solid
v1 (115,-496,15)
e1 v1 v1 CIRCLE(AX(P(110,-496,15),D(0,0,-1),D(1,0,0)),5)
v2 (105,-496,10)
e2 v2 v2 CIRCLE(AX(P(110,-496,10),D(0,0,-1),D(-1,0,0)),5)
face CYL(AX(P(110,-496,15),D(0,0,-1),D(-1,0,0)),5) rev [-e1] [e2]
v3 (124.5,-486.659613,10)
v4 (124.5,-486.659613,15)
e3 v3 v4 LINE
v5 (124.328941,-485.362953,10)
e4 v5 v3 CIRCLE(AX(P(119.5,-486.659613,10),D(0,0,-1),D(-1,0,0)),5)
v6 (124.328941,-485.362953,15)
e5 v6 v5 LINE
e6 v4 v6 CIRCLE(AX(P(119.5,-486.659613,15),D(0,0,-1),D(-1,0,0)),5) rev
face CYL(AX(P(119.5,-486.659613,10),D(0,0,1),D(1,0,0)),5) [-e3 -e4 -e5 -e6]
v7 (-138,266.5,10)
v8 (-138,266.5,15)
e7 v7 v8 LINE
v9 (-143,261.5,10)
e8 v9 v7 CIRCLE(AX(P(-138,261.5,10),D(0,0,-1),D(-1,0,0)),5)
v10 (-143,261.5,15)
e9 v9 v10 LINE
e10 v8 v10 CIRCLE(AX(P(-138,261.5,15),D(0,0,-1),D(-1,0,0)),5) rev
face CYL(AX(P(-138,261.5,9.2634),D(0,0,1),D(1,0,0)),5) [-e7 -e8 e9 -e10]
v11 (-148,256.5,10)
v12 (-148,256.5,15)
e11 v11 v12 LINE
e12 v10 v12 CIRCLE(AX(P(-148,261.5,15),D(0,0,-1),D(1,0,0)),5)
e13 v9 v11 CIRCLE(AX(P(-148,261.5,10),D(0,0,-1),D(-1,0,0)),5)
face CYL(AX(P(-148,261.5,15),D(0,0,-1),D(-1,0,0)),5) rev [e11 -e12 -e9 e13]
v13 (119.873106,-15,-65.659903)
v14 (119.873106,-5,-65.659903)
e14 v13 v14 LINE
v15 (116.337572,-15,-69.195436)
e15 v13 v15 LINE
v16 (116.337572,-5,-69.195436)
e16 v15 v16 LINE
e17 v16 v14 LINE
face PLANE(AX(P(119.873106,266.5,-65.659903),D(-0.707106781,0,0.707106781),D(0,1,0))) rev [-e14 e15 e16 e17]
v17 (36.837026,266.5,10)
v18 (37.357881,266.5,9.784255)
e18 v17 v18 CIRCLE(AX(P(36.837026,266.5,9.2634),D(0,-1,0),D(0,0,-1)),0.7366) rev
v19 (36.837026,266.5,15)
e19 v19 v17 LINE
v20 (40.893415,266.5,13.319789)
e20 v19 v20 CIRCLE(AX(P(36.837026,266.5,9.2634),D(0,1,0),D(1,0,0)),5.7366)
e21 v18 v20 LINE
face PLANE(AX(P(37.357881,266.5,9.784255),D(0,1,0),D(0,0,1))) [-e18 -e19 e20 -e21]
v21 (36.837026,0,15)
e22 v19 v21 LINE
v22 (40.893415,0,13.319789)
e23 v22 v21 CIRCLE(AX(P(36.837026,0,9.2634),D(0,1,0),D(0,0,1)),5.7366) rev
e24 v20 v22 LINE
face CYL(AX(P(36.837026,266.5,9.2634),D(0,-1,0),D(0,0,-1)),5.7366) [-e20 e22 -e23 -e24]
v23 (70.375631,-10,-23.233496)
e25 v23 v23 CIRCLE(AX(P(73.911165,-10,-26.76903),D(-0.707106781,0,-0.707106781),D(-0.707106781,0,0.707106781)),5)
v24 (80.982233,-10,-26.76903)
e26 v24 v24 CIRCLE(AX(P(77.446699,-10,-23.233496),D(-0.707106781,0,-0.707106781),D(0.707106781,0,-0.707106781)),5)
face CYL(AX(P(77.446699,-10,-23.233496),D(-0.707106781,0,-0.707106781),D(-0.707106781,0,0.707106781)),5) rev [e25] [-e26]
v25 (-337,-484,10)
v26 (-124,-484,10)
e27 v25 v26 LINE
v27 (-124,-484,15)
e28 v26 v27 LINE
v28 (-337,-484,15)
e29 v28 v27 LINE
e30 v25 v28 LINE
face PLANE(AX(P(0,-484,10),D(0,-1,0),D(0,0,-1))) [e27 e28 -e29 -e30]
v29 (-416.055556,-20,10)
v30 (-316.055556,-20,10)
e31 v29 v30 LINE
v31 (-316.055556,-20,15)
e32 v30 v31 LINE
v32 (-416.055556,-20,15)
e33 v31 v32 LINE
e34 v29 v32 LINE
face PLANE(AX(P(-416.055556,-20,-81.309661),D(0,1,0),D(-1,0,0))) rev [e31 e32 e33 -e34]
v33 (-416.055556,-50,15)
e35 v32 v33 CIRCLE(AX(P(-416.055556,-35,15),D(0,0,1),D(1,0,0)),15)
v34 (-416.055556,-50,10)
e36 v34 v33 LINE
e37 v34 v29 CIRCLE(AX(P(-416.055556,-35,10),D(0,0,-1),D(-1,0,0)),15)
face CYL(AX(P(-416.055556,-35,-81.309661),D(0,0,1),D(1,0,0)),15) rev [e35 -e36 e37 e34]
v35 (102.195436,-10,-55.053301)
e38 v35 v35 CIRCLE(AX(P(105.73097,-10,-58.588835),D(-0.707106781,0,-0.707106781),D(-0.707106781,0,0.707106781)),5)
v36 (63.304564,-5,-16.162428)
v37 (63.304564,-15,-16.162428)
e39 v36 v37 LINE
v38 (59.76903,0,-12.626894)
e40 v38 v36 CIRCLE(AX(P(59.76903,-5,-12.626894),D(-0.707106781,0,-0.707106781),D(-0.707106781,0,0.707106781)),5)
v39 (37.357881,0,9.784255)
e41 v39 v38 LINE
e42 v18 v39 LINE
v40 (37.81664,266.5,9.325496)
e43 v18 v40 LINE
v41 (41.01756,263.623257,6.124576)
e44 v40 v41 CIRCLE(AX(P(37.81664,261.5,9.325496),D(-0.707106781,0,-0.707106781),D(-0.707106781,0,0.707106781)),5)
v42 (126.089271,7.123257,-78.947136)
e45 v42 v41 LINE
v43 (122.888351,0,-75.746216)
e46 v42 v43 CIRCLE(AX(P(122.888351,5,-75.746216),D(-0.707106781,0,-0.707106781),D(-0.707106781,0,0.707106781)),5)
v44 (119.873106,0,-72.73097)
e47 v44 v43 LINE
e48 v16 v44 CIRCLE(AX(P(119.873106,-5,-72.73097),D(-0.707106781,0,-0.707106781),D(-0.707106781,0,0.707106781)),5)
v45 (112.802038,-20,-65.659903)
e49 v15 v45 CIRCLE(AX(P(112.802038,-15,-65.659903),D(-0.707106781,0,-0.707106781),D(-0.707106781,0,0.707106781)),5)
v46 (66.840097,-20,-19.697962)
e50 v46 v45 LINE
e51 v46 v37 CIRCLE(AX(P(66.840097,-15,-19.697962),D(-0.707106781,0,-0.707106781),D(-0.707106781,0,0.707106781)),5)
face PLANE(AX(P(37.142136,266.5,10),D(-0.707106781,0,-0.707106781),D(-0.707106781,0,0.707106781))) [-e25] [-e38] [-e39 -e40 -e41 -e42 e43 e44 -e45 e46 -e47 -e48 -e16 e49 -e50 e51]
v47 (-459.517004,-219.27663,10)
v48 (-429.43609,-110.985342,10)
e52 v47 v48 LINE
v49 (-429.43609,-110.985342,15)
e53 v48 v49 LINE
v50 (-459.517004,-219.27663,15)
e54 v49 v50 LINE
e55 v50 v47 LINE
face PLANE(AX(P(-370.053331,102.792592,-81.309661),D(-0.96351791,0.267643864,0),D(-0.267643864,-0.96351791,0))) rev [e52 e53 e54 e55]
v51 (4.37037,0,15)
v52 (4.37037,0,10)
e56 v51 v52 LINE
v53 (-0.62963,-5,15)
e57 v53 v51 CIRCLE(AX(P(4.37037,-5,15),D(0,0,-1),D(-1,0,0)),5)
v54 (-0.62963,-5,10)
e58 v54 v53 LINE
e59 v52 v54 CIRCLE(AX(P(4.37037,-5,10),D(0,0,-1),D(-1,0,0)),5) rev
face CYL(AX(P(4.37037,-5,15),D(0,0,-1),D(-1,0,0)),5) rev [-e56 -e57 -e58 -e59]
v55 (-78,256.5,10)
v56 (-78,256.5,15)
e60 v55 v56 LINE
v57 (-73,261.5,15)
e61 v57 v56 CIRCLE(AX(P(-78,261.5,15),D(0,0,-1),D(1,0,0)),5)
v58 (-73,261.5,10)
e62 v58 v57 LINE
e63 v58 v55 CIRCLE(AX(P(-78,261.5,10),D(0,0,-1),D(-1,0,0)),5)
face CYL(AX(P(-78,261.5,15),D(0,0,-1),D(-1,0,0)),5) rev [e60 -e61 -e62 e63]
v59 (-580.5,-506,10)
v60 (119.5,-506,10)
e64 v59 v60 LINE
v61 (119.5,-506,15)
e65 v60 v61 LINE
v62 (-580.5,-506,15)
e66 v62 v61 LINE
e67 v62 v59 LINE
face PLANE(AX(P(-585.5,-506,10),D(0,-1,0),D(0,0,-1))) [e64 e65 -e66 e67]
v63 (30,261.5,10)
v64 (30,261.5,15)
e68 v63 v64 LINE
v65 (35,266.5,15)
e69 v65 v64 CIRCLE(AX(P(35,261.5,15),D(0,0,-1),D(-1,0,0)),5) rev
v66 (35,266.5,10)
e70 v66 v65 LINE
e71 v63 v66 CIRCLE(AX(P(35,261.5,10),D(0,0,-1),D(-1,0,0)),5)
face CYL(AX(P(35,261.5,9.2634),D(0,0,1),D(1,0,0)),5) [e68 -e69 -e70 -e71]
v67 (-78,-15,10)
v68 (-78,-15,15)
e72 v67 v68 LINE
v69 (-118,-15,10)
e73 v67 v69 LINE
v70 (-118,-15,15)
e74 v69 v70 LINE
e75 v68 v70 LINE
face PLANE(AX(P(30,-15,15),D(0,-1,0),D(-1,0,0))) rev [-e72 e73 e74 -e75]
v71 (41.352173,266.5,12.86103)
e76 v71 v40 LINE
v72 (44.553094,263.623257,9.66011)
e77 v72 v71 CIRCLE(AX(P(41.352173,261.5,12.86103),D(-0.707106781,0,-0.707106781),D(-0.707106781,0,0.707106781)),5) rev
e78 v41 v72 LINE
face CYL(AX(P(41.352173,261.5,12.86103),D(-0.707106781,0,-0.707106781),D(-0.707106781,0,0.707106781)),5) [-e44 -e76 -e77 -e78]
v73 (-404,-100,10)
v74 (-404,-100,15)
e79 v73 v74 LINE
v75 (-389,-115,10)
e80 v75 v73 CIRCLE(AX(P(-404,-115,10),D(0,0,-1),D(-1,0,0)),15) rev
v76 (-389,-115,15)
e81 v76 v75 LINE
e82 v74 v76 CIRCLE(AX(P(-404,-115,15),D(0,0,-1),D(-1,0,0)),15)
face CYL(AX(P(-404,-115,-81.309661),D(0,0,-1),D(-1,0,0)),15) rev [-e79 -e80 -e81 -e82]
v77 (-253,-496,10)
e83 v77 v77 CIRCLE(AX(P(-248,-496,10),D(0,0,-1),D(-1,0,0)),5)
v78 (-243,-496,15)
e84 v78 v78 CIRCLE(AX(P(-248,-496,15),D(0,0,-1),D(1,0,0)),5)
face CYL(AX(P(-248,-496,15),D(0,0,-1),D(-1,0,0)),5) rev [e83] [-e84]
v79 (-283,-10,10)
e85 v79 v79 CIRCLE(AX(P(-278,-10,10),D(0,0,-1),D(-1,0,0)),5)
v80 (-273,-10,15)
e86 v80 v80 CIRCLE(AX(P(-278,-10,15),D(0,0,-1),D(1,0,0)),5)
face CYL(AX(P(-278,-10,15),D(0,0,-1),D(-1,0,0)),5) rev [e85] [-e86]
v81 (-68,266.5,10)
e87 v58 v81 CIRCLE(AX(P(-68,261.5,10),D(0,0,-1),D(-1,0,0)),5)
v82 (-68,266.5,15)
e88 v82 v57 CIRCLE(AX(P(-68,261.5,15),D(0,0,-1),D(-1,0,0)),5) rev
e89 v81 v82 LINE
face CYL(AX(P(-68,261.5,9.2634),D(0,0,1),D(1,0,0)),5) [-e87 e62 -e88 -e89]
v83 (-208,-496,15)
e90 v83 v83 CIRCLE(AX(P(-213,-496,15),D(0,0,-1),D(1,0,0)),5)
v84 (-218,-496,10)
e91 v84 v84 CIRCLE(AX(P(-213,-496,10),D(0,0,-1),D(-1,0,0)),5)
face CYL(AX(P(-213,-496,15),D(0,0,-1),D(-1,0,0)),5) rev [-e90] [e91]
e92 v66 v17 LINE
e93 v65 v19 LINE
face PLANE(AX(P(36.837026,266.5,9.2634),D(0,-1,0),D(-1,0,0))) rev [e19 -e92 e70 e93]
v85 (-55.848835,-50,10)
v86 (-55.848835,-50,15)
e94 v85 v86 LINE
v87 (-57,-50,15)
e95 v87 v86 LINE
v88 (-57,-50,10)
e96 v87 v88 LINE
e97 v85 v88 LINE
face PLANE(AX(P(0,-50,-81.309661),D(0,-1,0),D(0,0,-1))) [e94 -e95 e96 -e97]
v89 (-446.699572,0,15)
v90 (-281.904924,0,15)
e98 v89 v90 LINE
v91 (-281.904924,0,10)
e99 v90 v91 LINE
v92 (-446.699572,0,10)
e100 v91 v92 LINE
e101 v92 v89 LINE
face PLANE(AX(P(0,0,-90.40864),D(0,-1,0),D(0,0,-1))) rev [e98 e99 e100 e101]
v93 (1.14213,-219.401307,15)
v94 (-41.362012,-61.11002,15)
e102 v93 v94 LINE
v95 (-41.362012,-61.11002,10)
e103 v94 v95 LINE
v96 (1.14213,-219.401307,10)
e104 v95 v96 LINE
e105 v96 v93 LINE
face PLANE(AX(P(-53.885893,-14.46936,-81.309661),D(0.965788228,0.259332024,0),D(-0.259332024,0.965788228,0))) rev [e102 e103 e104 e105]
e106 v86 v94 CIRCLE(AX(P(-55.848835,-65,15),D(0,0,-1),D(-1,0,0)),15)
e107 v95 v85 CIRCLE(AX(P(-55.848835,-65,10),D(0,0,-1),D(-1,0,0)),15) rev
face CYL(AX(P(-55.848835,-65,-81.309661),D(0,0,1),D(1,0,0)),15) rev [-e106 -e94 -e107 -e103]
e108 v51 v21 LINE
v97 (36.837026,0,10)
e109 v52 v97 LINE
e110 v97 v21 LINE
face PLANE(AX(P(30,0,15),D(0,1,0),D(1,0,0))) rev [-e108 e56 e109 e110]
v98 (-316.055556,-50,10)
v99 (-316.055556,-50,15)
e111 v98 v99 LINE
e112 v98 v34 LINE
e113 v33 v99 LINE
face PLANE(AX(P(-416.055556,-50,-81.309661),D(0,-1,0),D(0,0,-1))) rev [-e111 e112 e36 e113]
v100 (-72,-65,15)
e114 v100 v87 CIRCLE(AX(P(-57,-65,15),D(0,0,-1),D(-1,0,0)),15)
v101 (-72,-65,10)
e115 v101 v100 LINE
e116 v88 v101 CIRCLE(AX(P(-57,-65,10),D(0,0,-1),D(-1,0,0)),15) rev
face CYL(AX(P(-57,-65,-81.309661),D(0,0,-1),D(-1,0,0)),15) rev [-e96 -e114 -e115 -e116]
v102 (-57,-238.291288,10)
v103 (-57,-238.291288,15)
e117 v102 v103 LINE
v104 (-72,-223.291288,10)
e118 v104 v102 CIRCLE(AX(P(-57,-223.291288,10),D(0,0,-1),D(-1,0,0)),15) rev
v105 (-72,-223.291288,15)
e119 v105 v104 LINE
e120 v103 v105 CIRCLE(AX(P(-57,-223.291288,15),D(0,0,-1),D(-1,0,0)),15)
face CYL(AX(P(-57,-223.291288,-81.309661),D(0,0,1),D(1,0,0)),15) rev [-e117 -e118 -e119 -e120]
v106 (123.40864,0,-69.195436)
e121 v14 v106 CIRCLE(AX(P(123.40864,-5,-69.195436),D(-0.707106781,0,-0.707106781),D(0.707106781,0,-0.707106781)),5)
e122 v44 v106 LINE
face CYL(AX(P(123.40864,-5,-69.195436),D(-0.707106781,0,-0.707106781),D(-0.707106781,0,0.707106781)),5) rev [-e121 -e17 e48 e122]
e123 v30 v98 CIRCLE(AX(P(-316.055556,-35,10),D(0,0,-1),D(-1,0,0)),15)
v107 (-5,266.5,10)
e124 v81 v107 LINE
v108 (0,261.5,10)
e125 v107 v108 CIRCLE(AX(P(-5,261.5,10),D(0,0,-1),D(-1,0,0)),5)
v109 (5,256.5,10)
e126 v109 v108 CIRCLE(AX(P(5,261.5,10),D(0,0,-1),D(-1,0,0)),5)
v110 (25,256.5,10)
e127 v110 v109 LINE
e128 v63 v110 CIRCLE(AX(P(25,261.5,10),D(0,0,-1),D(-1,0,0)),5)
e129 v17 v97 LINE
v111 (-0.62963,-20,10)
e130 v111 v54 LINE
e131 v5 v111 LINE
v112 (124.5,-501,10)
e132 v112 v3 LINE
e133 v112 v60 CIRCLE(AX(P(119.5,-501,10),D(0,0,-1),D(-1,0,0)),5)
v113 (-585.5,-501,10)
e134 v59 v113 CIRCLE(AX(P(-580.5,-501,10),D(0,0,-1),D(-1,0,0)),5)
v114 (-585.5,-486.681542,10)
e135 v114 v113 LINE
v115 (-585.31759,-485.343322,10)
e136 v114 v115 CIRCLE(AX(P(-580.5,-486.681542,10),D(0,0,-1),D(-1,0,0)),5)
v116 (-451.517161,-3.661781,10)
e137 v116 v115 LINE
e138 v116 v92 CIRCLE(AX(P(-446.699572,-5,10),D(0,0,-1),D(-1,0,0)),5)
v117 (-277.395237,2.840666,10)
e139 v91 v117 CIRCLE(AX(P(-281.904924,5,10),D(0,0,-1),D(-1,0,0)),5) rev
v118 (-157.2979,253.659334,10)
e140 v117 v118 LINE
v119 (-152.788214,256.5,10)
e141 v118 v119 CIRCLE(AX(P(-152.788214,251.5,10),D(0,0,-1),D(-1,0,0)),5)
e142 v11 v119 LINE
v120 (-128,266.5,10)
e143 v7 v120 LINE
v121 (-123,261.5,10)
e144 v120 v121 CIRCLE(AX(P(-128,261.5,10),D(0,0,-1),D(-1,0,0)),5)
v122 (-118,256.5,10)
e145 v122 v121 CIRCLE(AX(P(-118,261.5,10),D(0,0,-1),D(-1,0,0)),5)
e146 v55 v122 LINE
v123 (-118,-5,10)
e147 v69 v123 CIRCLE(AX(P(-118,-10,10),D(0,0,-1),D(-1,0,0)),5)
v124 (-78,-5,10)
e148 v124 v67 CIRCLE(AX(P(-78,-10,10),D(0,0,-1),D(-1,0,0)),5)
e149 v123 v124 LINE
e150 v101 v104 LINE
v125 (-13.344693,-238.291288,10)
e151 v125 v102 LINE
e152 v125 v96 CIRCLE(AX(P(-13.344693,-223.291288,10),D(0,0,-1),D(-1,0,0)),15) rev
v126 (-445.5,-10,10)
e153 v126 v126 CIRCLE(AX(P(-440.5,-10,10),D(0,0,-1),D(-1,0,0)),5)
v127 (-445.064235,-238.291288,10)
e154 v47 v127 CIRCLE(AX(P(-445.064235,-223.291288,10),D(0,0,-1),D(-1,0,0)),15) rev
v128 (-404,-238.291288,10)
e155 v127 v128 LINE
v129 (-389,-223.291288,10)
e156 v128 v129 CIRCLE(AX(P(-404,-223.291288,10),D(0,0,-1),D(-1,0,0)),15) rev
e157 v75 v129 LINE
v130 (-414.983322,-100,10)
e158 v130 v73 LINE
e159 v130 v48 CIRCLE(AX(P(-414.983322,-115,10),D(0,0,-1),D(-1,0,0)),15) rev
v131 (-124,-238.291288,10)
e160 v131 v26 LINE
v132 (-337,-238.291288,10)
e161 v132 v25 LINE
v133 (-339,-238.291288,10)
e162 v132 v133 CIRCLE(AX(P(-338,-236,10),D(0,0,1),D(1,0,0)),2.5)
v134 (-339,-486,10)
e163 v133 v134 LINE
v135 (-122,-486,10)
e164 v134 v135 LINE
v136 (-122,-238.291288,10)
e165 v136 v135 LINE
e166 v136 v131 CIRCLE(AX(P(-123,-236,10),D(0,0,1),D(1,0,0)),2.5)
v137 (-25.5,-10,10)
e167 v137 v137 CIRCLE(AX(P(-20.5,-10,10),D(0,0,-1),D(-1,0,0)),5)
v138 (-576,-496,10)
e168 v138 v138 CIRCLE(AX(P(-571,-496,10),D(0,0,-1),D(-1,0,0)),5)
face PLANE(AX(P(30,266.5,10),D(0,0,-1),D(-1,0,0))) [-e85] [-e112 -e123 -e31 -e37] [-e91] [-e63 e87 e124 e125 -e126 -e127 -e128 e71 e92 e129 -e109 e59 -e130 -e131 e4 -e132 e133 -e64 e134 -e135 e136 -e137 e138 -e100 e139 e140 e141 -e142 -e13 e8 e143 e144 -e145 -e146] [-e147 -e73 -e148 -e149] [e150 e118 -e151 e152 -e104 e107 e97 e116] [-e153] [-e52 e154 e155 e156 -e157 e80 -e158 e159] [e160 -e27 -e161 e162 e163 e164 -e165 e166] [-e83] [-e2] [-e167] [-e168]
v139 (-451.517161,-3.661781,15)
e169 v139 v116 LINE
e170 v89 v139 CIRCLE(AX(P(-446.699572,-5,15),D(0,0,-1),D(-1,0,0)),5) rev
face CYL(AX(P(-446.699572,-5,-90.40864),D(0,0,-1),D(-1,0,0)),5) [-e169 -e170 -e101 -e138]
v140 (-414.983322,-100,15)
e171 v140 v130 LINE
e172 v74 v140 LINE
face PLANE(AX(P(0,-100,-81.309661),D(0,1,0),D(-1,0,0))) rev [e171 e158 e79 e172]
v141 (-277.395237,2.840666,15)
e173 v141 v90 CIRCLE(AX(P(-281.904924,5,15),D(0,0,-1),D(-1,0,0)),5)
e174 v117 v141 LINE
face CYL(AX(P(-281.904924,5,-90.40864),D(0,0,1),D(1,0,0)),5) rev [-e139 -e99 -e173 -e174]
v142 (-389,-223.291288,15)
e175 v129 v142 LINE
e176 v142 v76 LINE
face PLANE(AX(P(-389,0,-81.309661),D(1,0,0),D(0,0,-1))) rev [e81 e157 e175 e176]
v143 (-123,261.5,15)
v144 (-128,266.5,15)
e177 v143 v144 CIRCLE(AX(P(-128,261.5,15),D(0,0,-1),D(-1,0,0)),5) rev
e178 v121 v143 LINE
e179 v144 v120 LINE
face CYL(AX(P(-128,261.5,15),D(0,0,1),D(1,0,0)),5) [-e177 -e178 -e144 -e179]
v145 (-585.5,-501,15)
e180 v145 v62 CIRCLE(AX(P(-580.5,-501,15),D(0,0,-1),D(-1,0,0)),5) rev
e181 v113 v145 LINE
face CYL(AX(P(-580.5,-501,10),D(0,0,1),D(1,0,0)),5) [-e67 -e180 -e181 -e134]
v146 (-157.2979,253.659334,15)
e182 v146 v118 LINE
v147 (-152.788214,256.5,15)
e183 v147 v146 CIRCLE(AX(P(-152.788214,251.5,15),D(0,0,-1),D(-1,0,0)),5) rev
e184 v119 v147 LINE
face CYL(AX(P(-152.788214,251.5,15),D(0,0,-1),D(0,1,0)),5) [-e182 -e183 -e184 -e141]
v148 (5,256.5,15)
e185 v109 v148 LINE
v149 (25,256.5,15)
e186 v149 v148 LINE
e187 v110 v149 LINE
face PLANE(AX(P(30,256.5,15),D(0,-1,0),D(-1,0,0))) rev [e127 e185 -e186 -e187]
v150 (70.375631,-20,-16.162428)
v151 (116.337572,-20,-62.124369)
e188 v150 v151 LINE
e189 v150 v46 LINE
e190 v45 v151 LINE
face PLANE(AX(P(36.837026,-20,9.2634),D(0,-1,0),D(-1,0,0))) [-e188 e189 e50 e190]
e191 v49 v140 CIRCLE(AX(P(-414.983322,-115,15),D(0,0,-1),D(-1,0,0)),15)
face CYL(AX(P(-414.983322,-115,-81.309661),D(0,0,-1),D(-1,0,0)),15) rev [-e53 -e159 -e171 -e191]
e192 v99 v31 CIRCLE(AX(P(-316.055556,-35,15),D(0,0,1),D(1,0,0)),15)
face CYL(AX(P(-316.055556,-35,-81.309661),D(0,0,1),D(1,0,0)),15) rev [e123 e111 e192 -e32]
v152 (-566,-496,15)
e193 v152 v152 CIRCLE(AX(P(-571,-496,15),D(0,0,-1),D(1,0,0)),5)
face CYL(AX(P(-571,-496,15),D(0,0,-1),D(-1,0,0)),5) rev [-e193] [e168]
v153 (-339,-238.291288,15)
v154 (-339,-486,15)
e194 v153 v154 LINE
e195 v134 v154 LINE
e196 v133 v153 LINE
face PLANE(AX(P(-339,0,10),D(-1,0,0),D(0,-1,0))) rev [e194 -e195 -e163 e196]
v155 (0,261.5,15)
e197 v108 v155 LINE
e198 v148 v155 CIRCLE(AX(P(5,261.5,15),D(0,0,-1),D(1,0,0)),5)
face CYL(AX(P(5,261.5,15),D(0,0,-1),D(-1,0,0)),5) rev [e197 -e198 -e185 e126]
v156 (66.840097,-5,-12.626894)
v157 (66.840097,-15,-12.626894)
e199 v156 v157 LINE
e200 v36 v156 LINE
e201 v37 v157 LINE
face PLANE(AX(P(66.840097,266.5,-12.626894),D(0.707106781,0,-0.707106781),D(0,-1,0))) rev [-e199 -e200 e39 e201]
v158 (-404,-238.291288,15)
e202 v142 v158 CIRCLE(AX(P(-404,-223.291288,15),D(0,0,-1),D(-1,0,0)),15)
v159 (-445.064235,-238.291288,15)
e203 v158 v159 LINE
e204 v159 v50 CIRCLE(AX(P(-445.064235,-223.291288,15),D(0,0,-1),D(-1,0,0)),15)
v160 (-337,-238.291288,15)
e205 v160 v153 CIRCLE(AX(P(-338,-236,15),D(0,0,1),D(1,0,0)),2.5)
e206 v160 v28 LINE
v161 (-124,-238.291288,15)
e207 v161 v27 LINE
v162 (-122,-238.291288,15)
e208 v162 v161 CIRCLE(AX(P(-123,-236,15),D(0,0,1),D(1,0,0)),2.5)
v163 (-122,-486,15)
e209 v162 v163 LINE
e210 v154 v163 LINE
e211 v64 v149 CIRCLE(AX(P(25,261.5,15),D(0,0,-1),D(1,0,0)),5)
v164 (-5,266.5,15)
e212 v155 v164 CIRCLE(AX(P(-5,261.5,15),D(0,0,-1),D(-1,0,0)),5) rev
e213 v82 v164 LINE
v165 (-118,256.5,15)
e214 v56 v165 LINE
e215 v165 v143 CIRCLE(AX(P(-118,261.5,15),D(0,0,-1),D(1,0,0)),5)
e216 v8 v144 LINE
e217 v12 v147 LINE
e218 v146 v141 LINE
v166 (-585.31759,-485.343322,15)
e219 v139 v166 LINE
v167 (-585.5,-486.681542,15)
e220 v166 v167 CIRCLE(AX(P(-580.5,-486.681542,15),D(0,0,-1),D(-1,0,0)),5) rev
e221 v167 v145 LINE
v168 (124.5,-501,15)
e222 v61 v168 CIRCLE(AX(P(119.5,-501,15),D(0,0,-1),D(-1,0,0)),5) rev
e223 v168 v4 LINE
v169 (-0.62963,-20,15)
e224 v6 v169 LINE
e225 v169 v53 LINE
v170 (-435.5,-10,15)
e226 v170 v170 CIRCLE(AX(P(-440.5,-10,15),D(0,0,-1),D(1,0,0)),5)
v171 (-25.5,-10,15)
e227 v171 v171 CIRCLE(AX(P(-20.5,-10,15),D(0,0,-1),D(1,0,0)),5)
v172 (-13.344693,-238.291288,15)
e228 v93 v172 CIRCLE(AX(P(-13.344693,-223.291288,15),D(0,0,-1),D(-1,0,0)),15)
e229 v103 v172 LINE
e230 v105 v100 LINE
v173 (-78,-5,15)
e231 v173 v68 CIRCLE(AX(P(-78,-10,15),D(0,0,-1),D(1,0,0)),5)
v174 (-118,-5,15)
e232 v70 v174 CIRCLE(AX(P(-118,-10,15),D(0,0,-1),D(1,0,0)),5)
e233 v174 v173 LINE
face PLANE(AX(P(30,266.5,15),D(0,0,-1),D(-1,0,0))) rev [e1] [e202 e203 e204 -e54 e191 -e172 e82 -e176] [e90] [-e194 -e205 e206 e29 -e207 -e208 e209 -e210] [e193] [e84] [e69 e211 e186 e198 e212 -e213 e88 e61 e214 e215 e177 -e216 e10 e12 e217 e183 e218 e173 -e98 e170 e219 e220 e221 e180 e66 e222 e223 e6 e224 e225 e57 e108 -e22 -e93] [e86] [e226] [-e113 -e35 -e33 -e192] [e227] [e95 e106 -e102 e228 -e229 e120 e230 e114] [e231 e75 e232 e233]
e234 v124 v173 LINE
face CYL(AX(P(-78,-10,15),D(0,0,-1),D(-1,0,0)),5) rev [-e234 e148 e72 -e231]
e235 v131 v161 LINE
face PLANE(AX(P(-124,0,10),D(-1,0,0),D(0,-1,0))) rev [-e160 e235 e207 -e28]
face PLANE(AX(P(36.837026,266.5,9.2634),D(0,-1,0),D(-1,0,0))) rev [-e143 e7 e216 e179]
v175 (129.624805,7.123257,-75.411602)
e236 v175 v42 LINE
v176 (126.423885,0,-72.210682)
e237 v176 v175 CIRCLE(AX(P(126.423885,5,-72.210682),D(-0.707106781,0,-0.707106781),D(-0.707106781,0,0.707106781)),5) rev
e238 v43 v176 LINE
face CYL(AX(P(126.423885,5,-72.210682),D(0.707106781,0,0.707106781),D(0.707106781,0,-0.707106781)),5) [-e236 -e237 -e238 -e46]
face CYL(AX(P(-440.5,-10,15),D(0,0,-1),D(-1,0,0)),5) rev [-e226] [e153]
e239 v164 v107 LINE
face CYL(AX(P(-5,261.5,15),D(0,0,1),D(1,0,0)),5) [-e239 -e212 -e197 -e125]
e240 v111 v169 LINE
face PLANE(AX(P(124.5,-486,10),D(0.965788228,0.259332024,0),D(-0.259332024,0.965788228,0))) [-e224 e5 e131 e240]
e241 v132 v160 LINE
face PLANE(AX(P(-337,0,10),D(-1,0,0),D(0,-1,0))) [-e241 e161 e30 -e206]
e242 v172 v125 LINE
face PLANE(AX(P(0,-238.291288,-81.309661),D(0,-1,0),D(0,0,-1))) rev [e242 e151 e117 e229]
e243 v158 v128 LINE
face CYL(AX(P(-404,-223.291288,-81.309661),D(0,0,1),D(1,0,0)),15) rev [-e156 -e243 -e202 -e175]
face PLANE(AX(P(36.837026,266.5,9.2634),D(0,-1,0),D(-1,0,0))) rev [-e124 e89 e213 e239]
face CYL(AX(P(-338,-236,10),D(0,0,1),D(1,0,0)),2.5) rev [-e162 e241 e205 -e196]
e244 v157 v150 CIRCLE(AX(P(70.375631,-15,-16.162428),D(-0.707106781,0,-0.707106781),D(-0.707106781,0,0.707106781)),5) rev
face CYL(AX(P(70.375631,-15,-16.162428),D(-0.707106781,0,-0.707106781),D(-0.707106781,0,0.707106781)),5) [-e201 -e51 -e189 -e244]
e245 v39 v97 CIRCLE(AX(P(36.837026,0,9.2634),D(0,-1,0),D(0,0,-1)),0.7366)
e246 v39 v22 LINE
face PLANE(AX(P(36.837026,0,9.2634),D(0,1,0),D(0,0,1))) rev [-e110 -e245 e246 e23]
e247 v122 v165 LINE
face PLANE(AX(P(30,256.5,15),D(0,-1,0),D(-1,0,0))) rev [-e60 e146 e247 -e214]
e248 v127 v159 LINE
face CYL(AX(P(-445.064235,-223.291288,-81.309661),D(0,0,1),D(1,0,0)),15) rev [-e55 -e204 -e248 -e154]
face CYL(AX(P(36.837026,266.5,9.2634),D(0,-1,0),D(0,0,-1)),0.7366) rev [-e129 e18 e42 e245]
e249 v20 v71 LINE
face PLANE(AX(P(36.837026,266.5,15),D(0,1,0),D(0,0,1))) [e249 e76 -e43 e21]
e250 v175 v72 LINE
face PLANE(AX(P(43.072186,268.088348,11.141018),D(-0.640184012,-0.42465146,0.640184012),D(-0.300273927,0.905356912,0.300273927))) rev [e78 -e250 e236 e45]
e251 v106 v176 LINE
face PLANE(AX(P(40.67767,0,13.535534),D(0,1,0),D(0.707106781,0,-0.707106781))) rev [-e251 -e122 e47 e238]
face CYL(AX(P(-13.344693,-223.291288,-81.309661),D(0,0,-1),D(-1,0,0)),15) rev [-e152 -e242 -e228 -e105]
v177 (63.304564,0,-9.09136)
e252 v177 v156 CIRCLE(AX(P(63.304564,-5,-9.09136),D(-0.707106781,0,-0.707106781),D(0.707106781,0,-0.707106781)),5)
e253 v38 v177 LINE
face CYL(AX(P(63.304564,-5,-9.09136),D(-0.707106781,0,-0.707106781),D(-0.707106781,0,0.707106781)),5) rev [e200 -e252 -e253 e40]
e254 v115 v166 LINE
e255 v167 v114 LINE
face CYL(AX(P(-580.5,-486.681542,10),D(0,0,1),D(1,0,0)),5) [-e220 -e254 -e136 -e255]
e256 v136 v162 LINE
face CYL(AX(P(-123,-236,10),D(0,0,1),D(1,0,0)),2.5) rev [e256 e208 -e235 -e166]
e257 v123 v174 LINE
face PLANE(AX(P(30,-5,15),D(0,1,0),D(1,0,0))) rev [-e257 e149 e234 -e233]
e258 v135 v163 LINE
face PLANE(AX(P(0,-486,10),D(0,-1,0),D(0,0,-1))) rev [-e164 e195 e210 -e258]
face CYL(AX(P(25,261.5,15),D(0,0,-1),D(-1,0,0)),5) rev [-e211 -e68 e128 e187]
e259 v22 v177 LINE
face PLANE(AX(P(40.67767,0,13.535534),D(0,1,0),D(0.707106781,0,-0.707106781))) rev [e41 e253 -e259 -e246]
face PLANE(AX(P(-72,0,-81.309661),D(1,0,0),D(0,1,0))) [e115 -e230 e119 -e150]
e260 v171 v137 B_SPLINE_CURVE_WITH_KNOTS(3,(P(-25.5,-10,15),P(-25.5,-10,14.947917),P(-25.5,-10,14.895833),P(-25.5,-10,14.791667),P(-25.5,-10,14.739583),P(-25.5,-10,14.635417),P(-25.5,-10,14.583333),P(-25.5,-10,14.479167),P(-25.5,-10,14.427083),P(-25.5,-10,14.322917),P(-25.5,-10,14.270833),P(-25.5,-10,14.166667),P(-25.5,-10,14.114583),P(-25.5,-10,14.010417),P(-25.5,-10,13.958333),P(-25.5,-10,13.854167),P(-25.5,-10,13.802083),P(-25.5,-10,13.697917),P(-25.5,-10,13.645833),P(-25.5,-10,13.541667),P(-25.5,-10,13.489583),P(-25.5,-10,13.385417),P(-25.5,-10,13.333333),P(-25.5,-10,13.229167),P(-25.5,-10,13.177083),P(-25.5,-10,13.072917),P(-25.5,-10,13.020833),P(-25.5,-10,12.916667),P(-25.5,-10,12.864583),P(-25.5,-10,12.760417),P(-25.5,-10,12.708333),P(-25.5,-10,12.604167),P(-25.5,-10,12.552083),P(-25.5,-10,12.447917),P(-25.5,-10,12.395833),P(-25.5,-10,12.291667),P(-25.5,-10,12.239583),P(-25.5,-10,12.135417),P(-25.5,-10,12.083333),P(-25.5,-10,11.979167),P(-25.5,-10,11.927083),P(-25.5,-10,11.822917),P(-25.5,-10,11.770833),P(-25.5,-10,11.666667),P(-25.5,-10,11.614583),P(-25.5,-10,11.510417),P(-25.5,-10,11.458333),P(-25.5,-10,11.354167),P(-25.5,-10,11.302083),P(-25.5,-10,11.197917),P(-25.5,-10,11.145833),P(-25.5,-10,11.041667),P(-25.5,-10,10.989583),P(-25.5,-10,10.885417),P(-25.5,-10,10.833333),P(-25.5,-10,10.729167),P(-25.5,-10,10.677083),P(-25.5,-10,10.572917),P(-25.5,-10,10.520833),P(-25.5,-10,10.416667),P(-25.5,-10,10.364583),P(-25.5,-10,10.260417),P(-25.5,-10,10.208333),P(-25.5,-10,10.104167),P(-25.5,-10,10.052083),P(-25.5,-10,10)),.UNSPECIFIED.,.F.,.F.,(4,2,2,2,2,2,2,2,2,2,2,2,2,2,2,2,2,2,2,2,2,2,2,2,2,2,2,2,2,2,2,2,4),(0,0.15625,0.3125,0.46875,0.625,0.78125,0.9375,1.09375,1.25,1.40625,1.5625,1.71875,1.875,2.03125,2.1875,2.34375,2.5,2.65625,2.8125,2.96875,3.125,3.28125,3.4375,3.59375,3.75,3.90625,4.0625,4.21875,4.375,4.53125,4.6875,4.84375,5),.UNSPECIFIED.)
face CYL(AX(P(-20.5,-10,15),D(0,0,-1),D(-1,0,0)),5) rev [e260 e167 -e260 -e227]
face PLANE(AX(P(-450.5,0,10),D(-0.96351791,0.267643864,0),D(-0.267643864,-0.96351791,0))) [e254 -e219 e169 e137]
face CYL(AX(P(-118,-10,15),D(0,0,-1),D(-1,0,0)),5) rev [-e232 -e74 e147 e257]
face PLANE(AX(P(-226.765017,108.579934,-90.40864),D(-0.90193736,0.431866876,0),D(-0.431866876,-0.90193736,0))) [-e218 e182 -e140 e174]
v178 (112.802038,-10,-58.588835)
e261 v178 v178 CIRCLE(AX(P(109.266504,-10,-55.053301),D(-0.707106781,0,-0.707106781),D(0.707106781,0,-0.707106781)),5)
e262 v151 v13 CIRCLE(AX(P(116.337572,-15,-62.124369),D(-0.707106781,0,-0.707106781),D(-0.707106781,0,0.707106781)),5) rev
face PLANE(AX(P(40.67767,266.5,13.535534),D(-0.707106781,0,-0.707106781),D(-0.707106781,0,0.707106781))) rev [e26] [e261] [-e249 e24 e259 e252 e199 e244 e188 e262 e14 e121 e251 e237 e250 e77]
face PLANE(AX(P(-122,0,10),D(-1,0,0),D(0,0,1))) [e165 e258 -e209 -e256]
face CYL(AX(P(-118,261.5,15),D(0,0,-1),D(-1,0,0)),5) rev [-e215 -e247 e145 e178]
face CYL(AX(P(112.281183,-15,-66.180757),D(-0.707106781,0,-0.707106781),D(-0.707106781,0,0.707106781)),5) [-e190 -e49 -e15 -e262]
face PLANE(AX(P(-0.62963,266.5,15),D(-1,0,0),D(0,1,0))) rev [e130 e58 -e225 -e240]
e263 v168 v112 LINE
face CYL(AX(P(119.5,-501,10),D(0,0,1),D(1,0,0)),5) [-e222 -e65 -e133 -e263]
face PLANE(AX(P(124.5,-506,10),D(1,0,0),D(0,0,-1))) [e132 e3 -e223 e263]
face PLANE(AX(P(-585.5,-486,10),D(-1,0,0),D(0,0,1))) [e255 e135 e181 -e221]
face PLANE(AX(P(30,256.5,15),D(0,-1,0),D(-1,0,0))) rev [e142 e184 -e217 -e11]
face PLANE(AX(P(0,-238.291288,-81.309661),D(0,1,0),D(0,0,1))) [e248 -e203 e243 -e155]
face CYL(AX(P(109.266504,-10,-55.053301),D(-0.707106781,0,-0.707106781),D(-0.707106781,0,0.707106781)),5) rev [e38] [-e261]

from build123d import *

# Parameters (mm, degrees)
SM_BASE_FLANGE_1_DEPTH      = 266.5
SM_BASE_FLANGE_1_DEPTH_BACK = 20
EXTRUDE_2_DEPTH             = 5
CUT_EXTRUDE_1_DEPTH         = 781.997587301
SKETCH_16_R                 = 5
CUT_EXTRUDE_6_DEPTH         = 804.201519225
CUT_EXTRUDE_7_DEPTH         = 780.82164677
SKETCH_18_W                 = 41.523044305
SKETCH_18_H                 = 20
SKETCH_18_R                 = 5
CUT_EXTRUDE_8_DEPTH         = 780.82164677
CUT_EXTRUDE_9_DEPTH         = 5
CUT_EXTRUDE_10_DEPTH        = 780.82164677
FILLET_1_R                  = 5
FILLET_2_R                  = 15
FILLET_3_R                  = 5


# Sheet-metal steps are written as plain solids
with BuildPart() as part:
    # Sketch 1 → ﾍﾞｰｽ-ﾌﾗﾝｼﾞ1 (new, two sides: drawn at the far end of the back side and taken through both)
    with BuildSketch(Plane(origin=(0, 0, 0), x_dir=(1, 0, 0), z_dir=(0, 1, 0)).offset(-SM_BASE_FLANGE_1_DEPTH_BACK)):
        with BuildLine():
            Line((137.550775542, 90.408639918), (37.357880769, -9.784254855))
            ThreePointArc((37.357880769, -9.784254855), (37.11891053, -9.943929664), (36.837025914, -10))
            Line((36.837025914, -10), (30, -10))
            Line((30, -10), (-450.5, -10))
            Line((-450.5, -10), (-450.5, -15))
            Line((-450.5, -15), (30, -15))
            Line((30, -15), (36.837025914, -15))
            ThreePointArc((36.837025914, -15), (39.032327692, -14.563327326), (40.893414675, -13.319788761))
            Line((40.893414675, -13.319788761), (141.086309448, 86.873106012))
            Line((141.086309448, 86.873106012), (137.550775542, 90.408639918))
        make_face()
    extrude(amount=SM_BASE_FLANGE_1_DEPTH + SM_BASE_FLANGE_1_DEPTH_BACK)

    # ｽｹｯﾁ15 → ﾎﾞｽ - 押し出し2 (add)
    with BuildSketch(Plane.XY.offset(15)):
        Polygon((-450.5, 0), (-585.5, -486), (-585.5, -506), (124.5, -506), (124.5, -486), (-6, 0), align=None)
    extrude(amount=-EXTRUDE_2_DEPTH)

    # ｽｹｯﾁ7 → ｶｯﾄ - 押し出し1 (cut, through all)
    with BuildSketch(Plane.XY.offset(15)):
        Polygon((-278.755408603, 0), (-151.149515417, 266.5), (-450.5, 266.5), (-450.5, 0), align=None)
    extrude(amount=-CUT_EXTRUDE_1_DEPTH, mode=Mode.SUBTRACT)

    # ｽｹｯﾁ16 → ｶｯﾄ - 押し出し6 (cut, through all)
    with BuildSketch(Plane(origin=(27.106601718, 0, 27.106601718), x_dir=(0.7071067811865438, 0, -0.7071067811865513), z_dir=(0.7071067811865513, 0, 0.7071067811865438))):
        with BuildLine():
            Line((23.323748893, 266.5), (148.323748893, 0))
            Line((148.323748893, 0), (136.191648507, 0))
            ThreePointArc((136.191648507, 0), (132.656114601, -1.464466094), (131.191648507, -5))
            Line((131.191648507, -5), (131.191648507, -20))
            Line((131.191648507, -20), (141.191648507, -20))
            Line((141.191648507, -20), (161.191648507, -20))
            Line((161.191648507, -20), (161.191648507, 266.5))
            Line((161.191648507, 266.5), (23.323748893, 266.5))
        make_face()
        with BuildLine():
            Line((51.191648507, 0), (19.497497865, 0))
            Line((19.497497865, 0), (19.497497865, -20))
            Line((19.497497865, -20), (46.191648507, -20))
            Line((46.191648507, -20), (56.191648507, -20))
            Line((56.191648507, -20), (56.191648507, -5))
            ThreePointArc((56.191648507, -5), (54.727182413, -1.464466094), (51.191648507, 0))
        make_face()
        with Locations(Location((116.191648507, -10, 0), (0, 0, 180))):
            Circle(SKETCH_16_R)
        with Locations(Location((71.191648507, -10, 0), (0, 0, 180))):
            Circle(SKETCH_16_R)
    extrude(amount=-CUT_EXTRUDE_6_DEPTH, mode=Mode.SUBTRACT)

    # ｽｹｯﾁ17 → ｶｯﾄ - 押し出し7 (cut, through all)
    with BuildSketch(Plane.XY.offset(15)):
        with BuildLine():
            Line((-416.055555556, -20), (-316.055555556, -20))
            ThreePointArc((-316.055555556, -20), (-301.055555556, -35), (-316.055555556, -50))
            Line((-316.055555556, -50), (-416.055555556, -50))
            ThreePointArc((-416.055555556, -50), (-431.055555556, -35), (-416.055555556, -20))
        make_face()
    extrude(amount=-CUT_EXTRUDE_7_DEPTH, mode=Mode.SUBTRACT)

    # ｽｹｯﾁ18 → ｶｯﾄ - 押し出し8 (cut, through all)
    with BuildSketch(Plane.XY.offset(15)):
        with BuildLine():
            Line((-78, -5), (-118, -5))
            ThreePointArc((-118, -5), (-123, -10), (-118, -15))
            Line((-118, -15), (-78, -15))
            ThreePointArc((-78, -15), (-73, -10), (-78, -5))
        make_face()
        with BuildLine():
            Line((-123, 266.5), (-123, 261.5))
            ThreePointArc((-123, 261.5), (-121.535533906, 257.964466094), (-118, 256.5))
            Line((-118, 256.5), (-78, 256.5))
            ThreePointArc((-78, 256.5), (-74.464466094, 257.964466094), (-73, 261.5))
            Line((-73, 261.5), (-73, 266.5))
            Line((-73, 266.5), (-123, 266.5))
        make_face()
        with BuildLine():
            ThreePointArc((0, 261.5), (1.464466094, 257.964466094), (5, 256.5))
            Line((5, 256.5), (25, 256.5))
            ThreePointArc((25, 256.5), (28.535533906, 257.964466094), (30, 261.5))
            Line((30, 261.5), (30, 266.5))
            Line((30, 266.5), (0, 266.5))
            Line((0, 266.5), (0, 261.5))
        make_face()
        with BuildLine():
            Line((-143, 266.5), (-151.149515417, 266.5))
            Line((-151.149515417, 266.5), (-155.937729045, 256.5))
            Line((-155.937729045, 256.5), (-148, 256.5))
            ThreePointArc((-148, 256.5), (-144.464466094, 257.964466094), (-143, 261.5))
            Line((-143, 261.5), (-143, 266.5))
        make_face()
        with Locations((20.131892523, -10)):
            Rectangle(SKETCH_18_W, SKETCH_18_H)
        with Locations(Location((110, -496, 0), (0, 0, 180))):
            Circle(SKETCH_18_R)
        with Locations(Location((-571, -496, 0), (0, 0, 180))):
            Circle(SKETCH_18_R)
        with Locations(Location((-213, -496, 0), (0, 0, 180))):
            Circle(SKETCH_18_R)
        with Locations(Location((-248, -496, 0), (0, 0, 180))):
            Circle(SKETCH_18_R)
        with Locations(Location((-440.5, -10, 0), (0, 0, 180))):
            Circle(SKETCH_18_R)
        with Locations(Location((-20.5, -10, 0), (0, 0, 180))):
            Circle(SKETCH_18_R)
        with Locations(Location((-278, -10, 0), (0, 0, 180))):
            Circle(SKETCH_18_R)
    extrude(amount=-CUT_EXTRUDE_8_DEPTH, mode=Mode.SUBTRACT)

    # ｽｹｯﾁ24 → ｶｯﾄ - 押し出し9 (cut)
    with BuildSketch(Plane.XY.offset(15)):
        with BuildLine():
            ThreePointArc((-337, -238.291287847), (-338, -233.5), (-339, -238.291287847))
            Line((-339, -238.291287847), (-339, -486))
            Line((-339, -486), (-122, -486))
            Line((-122, -486), (-122, -238.291287847))
            ThreePointArc((-122, -238.291287847), (-123, -233.5), (-124, -238.291287847))
            Line((-124, -238.291287847), (-124, -484))
            Line((-124, -484), (-337, -484))
            Line((-337, -484), (-337, -238.291287847))
        make_face()
    extrude(amount=-CUT_EXTRUDE_9_DEPTH, mode=Mode.SUBTRACT)

    # ｽｹｯﾁ25 → ｶｯﾄ - 押し出し10 (cut, through all)
    with BuildSketch(Plane.XY.offset(15)):
        Polygon((-44.345258018, -50), (-72, -50), (-72, -238.291287847), (6.214439645, -238.291287847), align=None)
        Polygon((-389, -238.291287847), (-389, -100), (-426.38460641, -100), (-464.798853035, -238.291287847), align=None)
    extrude(amount=-CUT_EXTRUDE_10_DEPTH, mode=Mode.SUBTRACT)

    # ﾌｨﾚｯﾄ1
    fillet_1_edges = [part.edges().sort_by_distance(p)[0] for p in [
        (-0.62962963, 0, 12.5),
    ]]
    fillet(fillet_1_edges, radius=FILLET_1_R)

    # ﾌｨﾚｯﾄ2
    fillet_2_edges = [part.edges().sort_by_distance(p)[0] for p in [
        (-389, -238.291287847, 12.5),
        (-464.798853035, -238.291287847, 12.5),
        (-426.38460641, -100, 12.5),
        (-389, -100, 12.5),
        (-72, -238.291287847, 12.5),
        (-72, -50, 12.5),
        (-44.345258018, -50, 12.5),
        (6.214439645, -238.291287847, 12.5),
    ]]
    fillet(fillet_2_edges, radius=FILLET_2_R)

    # ﾌｨﾚｯﾄ3
    fillet_3_edges = [part.edges().sort_by_distance(p)[0] for p in [
        (-155.937729045, 256.5, 12.5),
        (-143, 266.5, 12.5),
        (-123, 266.5, 12.5),
        (-73, 266.5, 12.5),
        (0, 266.5, 12.5),
        (30, 266.5, 12.5),
        (41.831215769, 266.5, 8.84645376),
        (130.219563418, 0, -79.541893888),
        (118.105339059, -20, -67.42766953),
        (65.07233047, -20, -14.394660941),
        (124.5, -486, 12.5),
        (124.5, -506, 12.5),
        (-585.5, -506, 12.5),
        (-585.5, -486, 12.5),
        (-450.5, 0, 12.5),
        (-278.755408603, 0, 12.5),
    ]]
    fillet(fillet_3_edges, radius=FILLET_3_R - 0.0001)  # a hair under: the kernel refuses the full size


solid = part.part
